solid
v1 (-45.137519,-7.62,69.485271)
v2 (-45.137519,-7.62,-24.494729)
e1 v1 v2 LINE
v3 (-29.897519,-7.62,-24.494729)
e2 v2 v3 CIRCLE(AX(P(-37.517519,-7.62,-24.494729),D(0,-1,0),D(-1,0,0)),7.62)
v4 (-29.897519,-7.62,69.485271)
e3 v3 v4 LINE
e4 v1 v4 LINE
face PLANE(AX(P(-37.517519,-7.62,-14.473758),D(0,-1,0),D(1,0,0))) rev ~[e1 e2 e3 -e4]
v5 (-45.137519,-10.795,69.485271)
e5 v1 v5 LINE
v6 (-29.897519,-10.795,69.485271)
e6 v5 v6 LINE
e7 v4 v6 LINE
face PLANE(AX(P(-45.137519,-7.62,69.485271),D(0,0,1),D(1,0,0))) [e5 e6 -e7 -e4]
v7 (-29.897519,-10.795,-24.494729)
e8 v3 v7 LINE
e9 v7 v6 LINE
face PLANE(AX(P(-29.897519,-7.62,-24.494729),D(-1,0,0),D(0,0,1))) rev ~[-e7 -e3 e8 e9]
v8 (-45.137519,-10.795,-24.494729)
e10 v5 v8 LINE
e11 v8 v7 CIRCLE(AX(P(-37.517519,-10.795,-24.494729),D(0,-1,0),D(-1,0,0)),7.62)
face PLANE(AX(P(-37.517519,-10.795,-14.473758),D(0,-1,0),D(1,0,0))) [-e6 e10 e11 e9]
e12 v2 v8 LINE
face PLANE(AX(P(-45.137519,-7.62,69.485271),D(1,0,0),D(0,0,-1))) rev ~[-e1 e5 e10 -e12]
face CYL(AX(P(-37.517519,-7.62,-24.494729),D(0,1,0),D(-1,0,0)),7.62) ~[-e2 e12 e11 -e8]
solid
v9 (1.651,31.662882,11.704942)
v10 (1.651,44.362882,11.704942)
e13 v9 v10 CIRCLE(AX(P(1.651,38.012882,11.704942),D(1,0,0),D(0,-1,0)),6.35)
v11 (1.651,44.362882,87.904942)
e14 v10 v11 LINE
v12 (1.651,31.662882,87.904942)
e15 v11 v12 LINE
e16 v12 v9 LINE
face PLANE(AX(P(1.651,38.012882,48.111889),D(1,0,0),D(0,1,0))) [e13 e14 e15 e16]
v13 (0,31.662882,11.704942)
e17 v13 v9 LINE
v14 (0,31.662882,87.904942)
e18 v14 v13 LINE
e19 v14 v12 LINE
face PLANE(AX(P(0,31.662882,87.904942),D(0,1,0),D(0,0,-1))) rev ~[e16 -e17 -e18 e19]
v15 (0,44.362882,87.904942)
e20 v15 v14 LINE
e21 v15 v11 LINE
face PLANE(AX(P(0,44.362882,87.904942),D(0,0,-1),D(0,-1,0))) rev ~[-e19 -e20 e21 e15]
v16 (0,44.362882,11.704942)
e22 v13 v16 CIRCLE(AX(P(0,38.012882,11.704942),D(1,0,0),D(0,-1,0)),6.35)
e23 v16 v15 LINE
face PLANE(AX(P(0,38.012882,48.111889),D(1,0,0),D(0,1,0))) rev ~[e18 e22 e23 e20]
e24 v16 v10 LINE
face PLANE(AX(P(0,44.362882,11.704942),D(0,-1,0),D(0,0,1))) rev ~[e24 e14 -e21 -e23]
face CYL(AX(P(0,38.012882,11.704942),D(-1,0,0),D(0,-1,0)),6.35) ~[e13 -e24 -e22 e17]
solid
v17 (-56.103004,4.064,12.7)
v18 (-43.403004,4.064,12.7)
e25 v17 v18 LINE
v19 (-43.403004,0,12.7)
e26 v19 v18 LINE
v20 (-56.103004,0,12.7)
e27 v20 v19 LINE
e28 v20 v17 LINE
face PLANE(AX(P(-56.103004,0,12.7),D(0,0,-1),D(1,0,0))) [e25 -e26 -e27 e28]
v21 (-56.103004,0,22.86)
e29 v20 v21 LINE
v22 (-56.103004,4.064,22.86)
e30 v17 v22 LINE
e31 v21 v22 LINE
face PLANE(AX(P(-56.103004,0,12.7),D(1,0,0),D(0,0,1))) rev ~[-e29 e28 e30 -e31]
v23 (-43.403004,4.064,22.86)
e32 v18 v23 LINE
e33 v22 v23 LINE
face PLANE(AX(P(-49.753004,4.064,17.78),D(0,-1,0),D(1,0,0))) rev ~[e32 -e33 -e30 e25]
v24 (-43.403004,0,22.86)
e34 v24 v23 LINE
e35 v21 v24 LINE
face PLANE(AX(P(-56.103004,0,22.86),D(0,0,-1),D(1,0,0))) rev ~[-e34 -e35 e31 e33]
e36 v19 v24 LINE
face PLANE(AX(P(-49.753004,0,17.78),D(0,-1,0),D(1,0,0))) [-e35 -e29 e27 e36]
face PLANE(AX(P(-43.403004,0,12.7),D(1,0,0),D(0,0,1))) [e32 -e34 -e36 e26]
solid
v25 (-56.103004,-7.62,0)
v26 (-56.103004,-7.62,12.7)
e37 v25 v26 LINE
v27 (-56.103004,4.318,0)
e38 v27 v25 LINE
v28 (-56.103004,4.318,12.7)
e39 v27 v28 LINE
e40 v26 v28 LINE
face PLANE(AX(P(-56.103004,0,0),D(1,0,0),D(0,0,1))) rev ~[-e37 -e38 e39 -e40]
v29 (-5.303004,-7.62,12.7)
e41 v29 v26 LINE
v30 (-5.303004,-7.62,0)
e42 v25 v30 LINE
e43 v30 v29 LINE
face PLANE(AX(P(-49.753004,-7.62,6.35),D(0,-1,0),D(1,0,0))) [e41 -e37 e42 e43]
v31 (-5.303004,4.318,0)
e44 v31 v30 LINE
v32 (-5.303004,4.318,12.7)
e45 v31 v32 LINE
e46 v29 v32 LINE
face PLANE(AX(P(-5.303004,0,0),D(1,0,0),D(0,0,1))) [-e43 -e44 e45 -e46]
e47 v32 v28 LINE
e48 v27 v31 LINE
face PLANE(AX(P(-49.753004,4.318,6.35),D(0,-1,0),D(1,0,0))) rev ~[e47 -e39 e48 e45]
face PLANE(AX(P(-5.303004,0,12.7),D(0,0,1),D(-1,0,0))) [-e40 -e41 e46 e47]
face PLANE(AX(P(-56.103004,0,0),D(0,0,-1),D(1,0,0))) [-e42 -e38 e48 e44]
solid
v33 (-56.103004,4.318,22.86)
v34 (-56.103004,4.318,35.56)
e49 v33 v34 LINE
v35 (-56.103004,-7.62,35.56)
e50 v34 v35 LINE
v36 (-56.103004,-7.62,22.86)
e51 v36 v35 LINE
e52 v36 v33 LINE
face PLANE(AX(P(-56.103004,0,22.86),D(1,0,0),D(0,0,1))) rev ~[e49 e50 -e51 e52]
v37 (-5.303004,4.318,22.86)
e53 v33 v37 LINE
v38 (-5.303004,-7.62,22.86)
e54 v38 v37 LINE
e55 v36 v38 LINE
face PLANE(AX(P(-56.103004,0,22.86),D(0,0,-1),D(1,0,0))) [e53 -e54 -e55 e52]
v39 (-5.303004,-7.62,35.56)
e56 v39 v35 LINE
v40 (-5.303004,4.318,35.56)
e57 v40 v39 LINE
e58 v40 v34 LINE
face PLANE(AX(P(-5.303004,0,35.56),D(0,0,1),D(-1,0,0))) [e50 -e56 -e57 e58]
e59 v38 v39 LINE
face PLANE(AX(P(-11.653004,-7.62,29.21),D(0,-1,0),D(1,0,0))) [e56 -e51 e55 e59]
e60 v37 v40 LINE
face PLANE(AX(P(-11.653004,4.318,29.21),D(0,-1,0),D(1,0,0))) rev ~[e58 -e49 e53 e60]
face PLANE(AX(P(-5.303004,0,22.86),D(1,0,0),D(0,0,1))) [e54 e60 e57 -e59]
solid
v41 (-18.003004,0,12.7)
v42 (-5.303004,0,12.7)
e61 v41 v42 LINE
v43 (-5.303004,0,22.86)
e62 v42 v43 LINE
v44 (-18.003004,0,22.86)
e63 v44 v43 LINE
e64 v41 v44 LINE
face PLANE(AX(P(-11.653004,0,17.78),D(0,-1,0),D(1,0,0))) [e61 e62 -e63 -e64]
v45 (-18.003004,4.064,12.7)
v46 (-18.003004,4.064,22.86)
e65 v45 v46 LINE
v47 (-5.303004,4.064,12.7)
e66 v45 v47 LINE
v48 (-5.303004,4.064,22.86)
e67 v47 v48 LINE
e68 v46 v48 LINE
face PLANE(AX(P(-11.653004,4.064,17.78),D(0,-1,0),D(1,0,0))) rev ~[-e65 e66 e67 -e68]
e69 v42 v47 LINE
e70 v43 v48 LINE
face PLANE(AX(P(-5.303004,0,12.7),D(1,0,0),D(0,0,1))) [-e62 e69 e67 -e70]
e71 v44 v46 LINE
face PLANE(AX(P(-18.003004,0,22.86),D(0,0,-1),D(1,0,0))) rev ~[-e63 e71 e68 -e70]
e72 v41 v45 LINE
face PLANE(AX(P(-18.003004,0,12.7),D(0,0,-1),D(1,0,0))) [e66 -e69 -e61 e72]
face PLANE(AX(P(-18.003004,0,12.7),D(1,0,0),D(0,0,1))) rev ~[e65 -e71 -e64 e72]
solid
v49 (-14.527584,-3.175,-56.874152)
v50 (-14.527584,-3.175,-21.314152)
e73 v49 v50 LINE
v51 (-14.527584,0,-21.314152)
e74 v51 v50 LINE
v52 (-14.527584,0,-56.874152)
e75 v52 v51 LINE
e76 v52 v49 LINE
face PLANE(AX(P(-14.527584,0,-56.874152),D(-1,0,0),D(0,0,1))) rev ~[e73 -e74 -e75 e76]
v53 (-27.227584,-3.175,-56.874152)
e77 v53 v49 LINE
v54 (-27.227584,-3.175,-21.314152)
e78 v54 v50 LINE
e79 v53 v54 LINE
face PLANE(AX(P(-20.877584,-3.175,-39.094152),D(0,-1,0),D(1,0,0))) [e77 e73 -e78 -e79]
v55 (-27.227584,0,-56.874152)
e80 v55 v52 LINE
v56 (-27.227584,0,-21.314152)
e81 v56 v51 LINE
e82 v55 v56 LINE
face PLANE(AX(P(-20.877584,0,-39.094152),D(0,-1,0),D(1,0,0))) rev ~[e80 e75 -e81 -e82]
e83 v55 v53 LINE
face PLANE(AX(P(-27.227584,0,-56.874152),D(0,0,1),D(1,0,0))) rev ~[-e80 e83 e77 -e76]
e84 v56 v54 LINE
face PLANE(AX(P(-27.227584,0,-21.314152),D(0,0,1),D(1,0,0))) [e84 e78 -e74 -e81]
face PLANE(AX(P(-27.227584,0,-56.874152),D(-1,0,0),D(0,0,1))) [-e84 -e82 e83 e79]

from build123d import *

# Parameters (mm, degrees)
F0_W          = 12.7
F0_H          = 12.7
F0_W_2        = 25.4
F1_DEPTH      = 7.62
F1_DEPTH_BACK = 4.318
F0_H_2        = 10.16
F2_DEPTH      = 4.064
F3_W          = 15.24
F3_H          = 12.7
F3_H_2        = 56.7852711724
F4_DEPTH      = 3.175
F6_DEPTH      = 1.651
F7_W          = 12.7
F7_H          = 35.56
F8_DEPTH      = 3.175


# Not quite as in the source:
# - a length typed as a fraction of an inch, garbled in the dataset ("3 / 203.2 mm" for 3/8 in), is restored
# - a feature names something its author has since deleted; it is built from what else it names


with BuildPart() as f1:
    # F0 (on Front) → F1 (new body, two sides)
    with BuildSketch(Plane.XZ) as f1_sk:
        with Locations((-11.6530044077, 29.21)):
            Rectangle(F0_W, F0_H)
        with Locations((-30.7030044077, 29.21)):
            Rectangle(F0_W_2, F0_H)
        with Locations((-49.7530044077, 29.21)):
            Rectangle(F0_W, F0_H)
    extrude(amount=F1_DEPTH)
    extrude(f1_sk.sketch, amount=-F1_DEPTH_BACK)


with BuildPart() as f1b:
    # F0 (on Front) → F1, piece 2 (new body, two sides)
    with BuildSketch(Plane.XZ) as f1_2_sk:
        with Locations((-49.7530044077, 6.35)):
            Rectangle(F0_W, F0_H)
        with Locations((-30.7030044077, 6.35)):
            Rectangle(F0_W_2, F0_H)
        with Locations((-11.6530044077, 6.35)):
            Rectangle(F0_W, F0_H)
    extrude(amount=F1_DEPTH)
    extrude(f1_2_sk.sketch, amount=-F1_DEPTH_BACK)


with BuildPart() as f2:
    # F0 (on Front) → F2 (new body)
    with BuildSketch(Plane.XZ):
        with Locations((-11.6530044077, 17.78)):
            Rectangle(F0_W, F0_H_2)
    extrude(amount=-F2_DEPTH)


with BuildPart() as f2b:
    # F0 (on Front) → F2, piece 2 (new body)
    with BuildSketch(Plane.XZ):
        with Locations((-49.7530044077, 17.78)):
            Rectangle(F0_W, F0_H_2)
    extrude(amount=-F2_DEPTH)


with BuildPart() as f4:
    # F3 (on face) → F4 (new body)
    with BuildSketch(Plane.XZ.offset(7.62)):
        with BuildLine():
            ThreePointArc((-45.1375190453, -24.4947288276), (-37.5175190453, -32.1147288276), (-29.8975190453, -24.4947288276))
            Line((-29.8975190453, -24.4947288276), (-29.8975190453, 0))
            Line((-29.8975190453, 0), (-45.1375190453, 0))
            Line((-45.1375190453, 0), (-45.1375190453, -24.4947288276))
        make_face()
        with Locations((-37.5175190453, 6.35)):
            Rectangle(F3_W, F3_H)
        with Locations((-37.5175190453, 41.0926355862)):
            Rectangle(F3_W, F3_H_2)
    extrude(amount=F4_DEPTH)


with BuildPart() as f6:
    # F5 (on Right) → F6 (new body)
    with BuildSketch(Plane.YZ):
        with BuildLine():
            Line((44.3628823752, 87.9049419045), (31.6628823752, 87.9049419045))
            Line((31.6628823752, 87.9049419045), (31.6628823752, 11.7049419045))
            ThreePointArc((31.6628823752, 11.7049419045), (38.0128823752, 5.3549419045), (44.3628823752, 11.7049419045))
            Line((44.3628823752, 11.7049419045), (44.3628823752, 87.9049419045))
        make_face()
    extrude(amount=F6_DEPTH)


with BuildPart() as f8:
    # F7 (on Front) → F8 (new body)
    with BuildSketch(Plane.XZ):
        with Locations((-20.8775842459, -39.0941523947)):
            Rectangle(F7_W, F7_H)
    extrude(amount=F8_DEPTH)


solid = Compound([f1.part, f1b.part, f2.part, f2b.part, f4.part, f6.part, f8.part])
